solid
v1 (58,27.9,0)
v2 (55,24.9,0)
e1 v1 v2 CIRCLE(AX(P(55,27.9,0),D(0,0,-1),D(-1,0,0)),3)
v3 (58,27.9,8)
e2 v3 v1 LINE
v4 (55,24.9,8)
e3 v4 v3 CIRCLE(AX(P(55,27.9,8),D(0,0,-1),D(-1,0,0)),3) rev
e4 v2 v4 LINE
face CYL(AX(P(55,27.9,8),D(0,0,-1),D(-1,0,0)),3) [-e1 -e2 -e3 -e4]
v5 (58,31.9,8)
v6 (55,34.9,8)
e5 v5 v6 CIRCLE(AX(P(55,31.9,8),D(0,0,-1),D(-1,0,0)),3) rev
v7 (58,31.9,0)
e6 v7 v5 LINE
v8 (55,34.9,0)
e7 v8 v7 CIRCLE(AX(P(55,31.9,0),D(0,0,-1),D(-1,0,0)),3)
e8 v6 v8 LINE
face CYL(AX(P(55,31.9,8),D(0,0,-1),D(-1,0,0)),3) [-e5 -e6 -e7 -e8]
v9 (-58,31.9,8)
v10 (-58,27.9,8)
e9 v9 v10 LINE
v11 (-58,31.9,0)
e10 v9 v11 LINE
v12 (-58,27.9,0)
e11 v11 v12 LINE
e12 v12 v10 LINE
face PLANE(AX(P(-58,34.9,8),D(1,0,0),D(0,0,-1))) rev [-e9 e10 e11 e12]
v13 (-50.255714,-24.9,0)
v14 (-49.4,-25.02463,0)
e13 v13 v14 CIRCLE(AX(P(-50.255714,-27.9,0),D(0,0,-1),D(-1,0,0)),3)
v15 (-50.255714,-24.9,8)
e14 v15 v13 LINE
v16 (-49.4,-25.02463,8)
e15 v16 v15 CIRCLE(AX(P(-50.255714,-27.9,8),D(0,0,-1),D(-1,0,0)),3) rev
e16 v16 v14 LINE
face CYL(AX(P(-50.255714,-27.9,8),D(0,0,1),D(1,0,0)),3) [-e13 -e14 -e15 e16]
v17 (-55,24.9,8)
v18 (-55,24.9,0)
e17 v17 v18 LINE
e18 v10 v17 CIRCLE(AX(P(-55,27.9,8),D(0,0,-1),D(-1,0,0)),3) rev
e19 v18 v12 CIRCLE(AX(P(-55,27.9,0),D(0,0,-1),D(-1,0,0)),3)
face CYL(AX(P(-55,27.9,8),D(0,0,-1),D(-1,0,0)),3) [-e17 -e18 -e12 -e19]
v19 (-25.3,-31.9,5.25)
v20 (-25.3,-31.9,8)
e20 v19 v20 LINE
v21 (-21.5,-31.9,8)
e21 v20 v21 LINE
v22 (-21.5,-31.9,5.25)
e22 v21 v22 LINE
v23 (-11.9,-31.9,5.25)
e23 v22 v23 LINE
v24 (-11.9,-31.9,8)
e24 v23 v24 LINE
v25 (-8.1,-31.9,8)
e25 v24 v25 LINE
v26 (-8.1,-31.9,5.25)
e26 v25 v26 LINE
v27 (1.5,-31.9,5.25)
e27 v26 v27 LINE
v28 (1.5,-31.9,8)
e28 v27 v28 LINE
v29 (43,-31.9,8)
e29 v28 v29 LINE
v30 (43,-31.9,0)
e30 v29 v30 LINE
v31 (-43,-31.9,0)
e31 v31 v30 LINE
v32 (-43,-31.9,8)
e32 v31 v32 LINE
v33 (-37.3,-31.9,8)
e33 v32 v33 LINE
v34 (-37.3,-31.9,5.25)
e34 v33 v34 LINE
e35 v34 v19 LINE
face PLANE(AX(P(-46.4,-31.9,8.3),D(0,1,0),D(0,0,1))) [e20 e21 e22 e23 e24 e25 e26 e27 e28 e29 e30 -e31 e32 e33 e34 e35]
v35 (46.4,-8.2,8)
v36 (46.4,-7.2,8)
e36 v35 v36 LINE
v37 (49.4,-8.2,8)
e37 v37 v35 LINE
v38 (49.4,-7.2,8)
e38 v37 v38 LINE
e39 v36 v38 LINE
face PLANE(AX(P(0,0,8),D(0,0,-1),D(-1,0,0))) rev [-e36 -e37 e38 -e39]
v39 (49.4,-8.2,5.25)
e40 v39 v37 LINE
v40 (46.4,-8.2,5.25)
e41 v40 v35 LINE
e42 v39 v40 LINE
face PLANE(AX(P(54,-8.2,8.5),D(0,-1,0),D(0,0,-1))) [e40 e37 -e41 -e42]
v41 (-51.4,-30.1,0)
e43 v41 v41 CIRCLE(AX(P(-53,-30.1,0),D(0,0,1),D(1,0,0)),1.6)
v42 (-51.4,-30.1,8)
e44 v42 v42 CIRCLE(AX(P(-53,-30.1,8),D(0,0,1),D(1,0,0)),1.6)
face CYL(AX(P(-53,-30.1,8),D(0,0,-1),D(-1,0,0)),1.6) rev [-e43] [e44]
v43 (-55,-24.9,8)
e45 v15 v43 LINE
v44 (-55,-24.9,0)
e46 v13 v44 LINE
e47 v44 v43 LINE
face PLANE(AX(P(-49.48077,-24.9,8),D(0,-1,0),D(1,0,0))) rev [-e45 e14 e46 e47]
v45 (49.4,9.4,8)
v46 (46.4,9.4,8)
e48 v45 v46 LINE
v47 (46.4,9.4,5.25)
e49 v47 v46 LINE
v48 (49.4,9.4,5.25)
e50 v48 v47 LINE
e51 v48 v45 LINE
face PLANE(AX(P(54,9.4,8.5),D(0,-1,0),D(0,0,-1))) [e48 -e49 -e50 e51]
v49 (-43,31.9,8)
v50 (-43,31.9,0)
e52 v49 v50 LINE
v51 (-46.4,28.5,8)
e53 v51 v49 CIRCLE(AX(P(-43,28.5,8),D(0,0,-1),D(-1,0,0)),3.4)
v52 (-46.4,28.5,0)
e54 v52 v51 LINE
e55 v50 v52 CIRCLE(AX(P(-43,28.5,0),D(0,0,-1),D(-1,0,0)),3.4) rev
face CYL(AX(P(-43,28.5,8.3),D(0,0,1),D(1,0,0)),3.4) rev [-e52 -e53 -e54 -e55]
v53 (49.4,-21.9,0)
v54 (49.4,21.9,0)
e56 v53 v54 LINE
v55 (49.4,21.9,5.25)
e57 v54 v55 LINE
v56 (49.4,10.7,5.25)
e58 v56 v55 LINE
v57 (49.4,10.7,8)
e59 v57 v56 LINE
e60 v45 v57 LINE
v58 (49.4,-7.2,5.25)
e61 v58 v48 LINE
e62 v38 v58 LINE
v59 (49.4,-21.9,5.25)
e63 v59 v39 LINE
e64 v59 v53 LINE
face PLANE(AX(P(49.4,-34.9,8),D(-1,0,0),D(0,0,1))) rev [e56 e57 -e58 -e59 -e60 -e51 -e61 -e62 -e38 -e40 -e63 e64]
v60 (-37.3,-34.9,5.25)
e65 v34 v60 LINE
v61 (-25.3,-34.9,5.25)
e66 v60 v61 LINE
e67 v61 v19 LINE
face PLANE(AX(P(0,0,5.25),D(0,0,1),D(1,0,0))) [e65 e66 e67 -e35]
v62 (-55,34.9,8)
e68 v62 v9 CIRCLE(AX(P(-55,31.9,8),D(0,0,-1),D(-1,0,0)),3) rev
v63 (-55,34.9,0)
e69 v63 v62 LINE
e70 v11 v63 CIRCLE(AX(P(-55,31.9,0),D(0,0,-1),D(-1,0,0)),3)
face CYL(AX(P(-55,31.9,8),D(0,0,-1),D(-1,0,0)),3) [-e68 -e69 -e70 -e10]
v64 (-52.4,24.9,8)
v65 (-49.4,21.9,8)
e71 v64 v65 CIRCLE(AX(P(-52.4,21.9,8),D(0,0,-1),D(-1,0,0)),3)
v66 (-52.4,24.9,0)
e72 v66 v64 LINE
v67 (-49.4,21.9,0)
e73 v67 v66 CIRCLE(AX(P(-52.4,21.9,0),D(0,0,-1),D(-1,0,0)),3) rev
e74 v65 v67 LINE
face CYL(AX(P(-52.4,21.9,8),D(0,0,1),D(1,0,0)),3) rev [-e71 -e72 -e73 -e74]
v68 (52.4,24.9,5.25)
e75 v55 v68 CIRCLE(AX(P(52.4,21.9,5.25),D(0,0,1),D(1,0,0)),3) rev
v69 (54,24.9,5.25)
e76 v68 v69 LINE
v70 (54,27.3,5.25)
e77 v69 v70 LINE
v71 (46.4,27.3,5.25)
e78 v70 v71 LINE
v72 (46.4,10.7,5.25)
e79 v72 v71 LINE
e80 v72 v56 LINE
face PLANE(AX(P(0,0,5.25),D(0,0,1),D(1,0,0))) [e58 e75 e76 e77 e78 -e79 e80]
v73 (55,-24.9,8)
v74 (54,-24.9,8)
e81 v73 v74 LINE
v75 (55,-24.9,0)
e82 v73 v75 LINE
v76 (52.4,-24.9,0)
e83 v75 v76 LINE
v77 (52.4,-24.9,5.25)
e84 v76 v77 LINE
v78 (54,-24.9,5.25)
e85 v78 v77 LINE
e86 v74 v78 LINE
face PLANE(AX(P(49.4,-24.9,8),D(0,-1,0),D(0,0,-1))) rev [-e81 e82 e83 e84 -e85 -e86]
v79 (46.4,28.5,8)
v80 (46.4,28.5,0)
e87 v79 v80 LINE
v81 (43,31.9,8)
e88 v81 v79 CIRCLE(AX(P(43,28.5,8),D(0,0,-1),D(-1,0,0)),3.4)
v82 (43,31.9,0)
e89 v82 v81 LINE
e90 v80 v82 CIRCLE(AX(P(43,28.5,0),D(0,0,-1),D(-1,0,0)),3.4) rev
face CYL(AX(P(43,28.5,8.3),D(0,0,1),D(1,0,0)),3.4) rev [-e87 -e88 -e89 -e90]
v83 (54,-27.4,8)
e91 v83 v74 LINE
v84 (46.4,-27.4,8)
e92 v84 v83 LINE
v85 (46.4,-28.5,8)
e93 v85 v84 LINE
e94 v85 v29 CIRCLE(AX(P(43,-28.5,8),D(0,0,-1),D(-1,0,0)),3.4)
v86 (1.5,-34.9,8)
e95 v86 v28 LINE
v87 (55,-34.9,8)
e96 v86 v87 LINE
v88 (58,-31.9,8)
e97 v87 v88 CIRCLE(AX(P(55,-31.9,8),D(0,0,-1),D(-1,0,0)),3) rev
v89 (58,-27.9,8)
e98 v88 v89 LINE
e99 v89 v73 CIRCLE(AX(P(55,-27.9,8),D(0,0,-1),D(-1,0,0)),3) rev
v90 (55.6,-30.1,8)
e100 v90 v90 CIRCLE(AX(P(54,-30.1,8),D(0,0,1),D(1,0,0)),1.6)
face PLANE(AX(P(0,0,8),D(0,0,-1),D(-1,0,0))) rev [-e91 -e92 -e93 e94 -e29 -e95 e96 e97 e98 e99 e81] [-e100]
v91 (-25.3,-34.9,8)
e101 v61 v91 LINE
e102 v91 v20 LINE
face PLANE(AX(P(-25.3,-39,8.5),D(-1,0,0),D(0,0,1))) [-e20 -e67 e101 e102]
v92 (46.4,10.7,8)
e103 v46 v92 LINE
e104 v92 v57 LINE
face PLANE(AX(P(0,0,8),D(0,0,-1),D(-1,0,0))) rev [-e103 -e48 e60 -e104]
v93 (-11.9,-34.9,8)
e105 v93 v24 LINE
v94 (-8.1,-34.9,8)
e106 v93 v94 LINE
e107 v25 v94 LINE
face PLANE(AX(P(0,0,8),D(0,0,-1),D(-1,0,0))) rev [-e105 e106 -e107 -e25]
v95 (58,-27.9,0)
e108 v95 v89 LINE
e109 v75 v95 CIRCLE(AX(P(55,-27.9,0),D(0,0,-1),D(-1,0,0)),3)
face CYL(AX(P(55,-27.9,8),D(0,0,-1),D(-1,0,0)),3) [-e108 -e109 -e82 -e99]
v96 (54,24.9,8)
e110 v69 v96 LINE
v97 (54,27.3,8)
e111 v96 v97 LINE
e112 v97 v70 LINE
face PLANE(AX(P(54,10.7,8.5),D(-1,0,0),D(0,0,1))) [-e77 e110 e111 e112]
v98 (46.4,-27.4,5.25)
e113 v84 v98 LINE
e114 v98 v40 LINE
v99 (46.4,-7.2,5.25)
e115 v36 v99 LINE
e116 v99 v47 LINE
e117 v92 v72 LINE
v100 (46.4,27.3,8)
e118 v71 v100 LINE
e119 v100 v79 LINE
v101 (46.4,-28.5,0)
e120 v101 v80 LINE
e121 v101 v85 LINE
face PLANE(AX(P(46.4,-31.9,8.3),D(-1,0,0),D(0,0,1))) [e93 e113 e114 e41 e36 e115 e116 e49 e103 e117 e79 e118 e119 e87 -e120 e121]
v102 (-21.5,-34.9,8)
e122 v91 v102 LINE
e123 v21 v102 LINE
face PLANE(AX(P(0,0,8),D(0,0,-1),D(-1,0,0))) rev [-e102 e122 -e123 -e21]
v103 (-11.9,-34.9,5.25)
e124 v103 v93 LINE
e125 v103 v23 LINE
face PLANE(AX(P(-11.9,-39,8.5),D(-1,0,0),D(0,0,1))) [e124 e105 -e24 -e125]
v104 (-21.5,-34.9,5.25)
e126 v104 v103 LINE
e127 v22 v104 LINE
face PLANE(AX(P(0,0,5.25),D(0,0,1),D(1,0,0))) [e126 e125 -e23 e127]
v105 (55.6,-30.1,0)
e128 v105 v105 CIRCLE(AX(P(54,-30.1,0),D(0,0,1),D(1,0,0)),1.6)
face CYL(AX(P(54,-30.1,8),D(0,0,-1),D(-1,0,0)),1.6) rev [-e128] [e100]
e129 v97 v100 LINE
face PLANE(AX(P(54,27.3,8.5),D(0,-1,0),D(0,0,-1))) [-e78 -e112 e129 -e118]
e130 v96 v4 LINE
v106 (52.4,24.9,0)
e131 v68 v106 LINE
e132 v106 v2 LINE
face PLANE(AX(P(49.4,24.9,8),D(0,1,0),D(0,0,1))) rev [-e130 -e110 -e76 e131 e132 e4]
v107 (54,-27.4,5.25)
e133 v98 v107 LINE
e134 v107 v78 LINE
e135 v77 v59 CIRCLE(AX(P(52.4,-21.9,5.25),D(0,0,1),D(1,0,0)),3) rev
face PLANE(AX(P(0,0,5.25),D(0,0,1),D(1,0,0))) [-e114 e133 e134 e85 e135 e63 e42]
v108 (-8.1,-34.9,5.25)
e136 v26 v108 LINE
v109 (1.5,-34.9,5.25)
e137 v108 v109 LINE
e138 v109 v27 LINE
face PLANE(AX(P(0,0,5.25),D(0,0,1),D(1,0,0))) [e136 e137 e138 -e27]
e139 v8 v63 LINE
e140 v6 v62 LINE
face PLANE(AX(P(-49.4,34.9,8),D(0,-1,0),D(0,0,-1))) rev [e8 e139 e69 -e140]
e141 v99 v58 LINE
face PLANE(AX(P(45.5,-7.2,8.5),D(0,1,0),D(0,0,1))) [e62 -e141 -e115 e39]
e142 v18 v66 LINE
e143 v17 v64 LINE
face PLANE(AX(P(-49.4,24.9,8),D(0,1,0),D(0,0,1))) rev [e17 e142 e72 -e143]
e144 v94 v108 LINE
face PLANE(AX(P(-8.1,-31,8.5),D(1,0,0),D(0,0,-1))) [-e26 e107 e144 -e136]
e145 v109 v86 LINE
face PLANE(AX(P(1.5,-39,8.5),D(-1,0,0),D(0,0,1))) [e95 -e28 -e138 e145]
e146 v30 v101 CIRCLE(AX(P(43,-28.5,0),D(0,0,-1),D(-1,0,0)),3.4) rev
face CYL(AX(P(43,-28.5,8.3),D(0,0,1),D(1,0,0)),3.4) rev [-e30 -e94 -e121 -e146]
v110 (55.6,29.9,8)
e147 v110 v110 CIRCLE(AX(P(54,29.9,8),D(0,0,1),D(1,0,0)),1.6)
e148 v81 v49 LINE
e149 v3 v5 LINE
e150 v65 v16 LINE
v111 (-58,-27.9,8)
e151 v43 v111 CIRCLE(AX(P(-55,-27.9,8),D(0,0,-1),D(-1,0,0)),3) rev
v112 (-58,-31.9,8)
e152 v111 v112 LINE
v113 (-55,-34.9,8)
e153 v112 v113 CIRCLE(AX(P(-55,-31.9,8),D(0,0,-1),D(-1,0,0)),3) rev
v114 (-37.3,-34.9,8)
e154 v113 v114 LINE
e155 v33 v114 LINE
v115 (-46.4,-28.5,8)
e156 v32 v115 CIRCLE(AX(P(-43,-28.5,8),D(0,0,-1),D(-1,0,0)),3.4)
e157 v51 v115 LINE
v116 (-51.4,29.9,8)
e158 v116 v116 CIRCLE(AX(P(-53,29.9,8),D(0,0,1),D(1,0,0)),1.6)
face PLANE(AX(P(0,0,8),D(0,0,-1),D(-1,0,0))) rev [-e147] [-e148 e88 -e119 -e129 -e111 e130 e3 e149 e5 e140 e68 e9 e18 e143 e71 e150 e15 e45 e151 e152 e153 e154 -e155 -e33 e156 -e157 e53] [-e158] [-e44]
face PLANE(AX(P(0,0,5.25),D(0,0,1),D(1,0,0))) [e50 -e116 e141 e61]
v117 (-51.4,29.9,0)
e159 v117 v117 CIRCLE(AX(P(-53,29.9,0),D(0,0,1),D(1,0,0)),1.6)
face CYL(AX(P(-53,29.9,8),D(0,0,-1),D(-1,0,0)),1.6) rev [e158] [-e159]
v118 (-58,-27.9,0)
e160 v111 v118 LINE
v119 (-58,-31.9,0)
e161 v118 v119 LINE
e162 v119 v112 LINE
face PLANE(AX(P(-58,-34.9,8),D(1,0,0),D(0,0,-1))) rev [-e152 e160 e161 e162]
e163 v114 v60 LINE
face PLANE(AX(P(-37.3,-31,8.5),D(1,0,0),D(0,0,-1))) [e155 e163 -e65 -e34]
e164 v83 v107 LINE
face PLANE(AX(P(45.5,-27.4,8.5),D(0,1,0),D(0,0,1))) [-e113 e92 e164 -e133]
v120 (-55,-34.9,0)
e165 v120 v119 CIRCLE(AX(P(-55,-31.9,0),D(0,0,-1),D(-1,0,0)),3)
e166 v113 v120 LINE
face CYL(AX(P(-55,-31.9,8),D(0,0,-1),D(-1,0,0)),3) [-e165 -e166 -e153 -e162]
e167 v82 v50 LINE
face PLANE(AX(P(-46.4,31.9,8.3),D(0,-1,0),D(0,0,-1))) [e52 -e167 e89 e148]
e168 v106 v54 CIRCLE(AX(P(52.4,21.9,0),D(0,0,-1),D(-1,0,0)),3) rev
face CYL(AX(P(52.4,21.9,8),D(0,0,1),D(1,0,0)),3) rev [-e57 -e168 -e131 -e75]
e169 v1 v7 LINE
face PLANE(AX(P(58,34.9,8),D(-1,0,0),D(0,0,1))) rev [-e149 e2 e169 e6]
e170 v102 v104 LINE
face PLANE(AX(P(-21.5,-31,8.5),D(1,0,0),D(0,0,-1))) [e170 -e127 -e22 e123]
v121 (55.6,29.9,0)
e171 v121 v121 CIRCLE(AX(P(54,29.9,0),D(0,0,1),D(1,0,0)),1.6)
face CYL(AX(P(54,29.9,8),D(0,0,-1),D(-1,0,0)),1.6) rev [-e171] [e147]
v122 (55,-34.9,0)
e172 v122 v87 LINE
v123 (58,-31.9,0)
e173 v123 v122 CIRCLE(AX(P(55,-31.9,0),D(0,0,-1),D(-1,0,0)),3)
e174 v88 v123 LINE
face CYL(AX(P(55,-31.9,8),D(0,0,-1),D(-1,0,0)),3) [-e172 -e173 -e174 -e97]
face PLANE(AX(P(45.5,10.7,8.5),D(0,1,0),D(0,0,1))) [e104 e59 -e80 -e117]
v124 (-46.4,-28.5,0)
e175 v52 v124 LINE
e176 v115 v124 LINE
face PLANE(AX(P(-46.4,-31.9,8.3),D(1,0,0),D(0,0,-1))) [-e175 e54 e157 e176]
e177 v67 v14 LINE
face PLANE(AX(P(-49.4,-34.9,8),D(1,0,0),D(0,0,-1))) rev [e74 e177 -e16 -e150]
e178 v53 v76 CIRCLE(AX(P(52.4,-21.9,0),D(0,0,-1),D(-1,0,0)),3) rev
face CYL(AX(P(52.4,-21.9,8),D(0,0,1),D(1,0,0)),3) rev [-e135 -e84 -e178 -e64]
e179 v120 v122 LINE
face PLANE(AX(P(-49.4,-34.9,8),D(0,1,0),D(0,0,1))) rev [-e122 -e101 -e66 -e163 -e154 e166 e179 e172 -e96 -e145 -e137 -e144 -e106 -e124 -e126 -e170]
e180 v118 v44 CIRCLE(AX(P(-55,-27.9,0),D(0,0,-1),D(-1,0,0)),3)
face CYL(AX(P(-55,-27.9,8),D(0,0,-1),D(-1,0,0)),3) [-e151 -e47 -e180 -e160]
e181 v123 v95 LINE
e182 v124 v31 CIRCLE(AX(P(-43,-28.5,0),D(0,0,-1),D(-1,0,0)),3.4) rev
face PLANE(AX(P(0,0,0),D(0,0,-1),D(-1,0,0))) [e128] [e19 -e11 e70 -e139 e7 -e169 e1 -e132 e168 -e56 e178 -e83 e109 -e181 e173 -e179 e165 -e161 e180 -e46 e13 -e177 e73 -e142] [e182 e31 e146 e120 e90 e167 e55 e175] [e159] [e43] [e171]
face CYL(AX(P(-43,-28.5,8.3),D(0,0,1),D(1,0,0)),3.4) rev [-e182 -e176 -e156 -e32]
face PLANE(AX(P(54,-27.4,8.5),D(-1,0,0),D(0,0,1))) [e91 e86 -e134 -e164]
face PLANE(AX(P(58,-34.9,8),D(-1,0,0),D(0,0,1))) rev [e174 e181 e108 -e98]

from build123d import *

# Parameters (mm, degrees)
FRAMEOUTSIDE_W                    = 98.8
FRAMEOUTSIDE_H                    = 69.8
FRAME_HEIGHT_8_DEPTH              = 8
OUTSIDE_R6P4_R                    = 6.4
FRAMEINSIDE_W                     = 92.8
FRAMEINSIDE_H                     = 63.8
OPEN_THROUGH_FRAME_DEPTH          = 8.3
INSIDE_R3P4_R                     = 3.4
FOUR_CORNER_EARS_R2_PITCH110X80_R = 1.6
INTEGRAL_EARS_4X3P2_DEPTH         = 8
OPEN_TOP_CABLE_RELIEFS_START      = 5.25
PLUG_CLEARANCE_PROFILES_W         = 12
PLUG_CLEARANCE_PROFILES_H         = 8
PLUG_CLEARANCE_PROFILES_W_2       = 9.6
PLUG_CLEARANCE_PROFILES_W_3       = 8.5
PLUG_CLEARANCE_PROFILES_H_2       = 19.2
PLUG_CLEARANCE_PROFILES_H_3       = 16.6
OPEN_TOP_CABLE_RELIEFS_DEPTH      = 3.25
FILLET_1_R                        = 3


with BuildPart() as part:
    # FrameOutside → Frame_Height_8 (new body)
    with BuildSketch(Plane.XY):
        Rectangle(FRAMEOUTSIDE_W, FRAMEOUTSIDE_H)
    extrude(amount=FRAME_HEIGHT_8_DEPTH)

    # Outside_R6p4
    outside_r6p4_edges = [part.edges().sort_by_distance(p)[0] for p in [
        (49.4, -34.9, 4),
        (-49.4, -34.9, 4),
        (-49.4, 34.9, 4),
        (49.4, 34.9, 4),
    ]]
    fillet(outside_r6p4_edges, radius=OUTSIDE_R6P4_R)

    # FrameInside → Open_Through_Frame (cut)
    with BuildSketch(Plane.XY):
        Rectangle(FRAMEINSIDE_W, FRAMEINSIDE_H)
    extrude(amount=OPEN_THROUGH_FRAME_DEPTH, mode=Mode.SUBTRACT)

    # Inside_R3p4
    inside_r3p4_edges = [part.edges().sort_by_distance(p)[0] for p in [
        (46.4, -31.9, 4),
        (46.4, 31.9, 4),
        (-46.4, 31.9, 4),
        (-46.4, -31.9, 4),
    ]]
    fillet(inside_r3p4_edges, radius=INSIDE_R3P4_R)

    # Four_Corner_Ears_R2_Pitch110x80 → Integral_Ears_4x3p2 (add)
    # profile 1 of 4: a face of its own
    with BuildSketch(Plane.XY):
        Polygon((43, 34.9), (58, 34.9), (58, 24.9), (49.4, 24.9), align=None)
        with Locations((54, 29.9)):
            Circle(FOUR_CORNER_EARS_R2_PITCH110X80_R, mode=Mode.SUBTRACT)
    # profile 2 of 4: a face of its own
    with BuildSketch(Plane.XY):
        Polygon((43, -34.9), (58, -34.9), (58, -24.9), (49.4, -24.9), align=None)
        with Locations((54, -30.1)):
            Circle(FOUR_CORNER_EARS_R2_PITCH110X80_R, mode=Mode.SUBTRACT)
    # profile 3 of 4: a face of its own
    with BuildSketch(Plane.XY):
        Polygon((-43, -34.9), (-58, -34.9), (-58, -24.9), (-49.480769769, -24.9), align=None)
        with Locations((-53, -30.1)):
            Circle(FOUR_CORNER_EARS_R2_PITCH110X80_R, mode=Mode.SUBTRACT)
    # profile 4 of 4: a face of its own
    with BuildSketch(Plane.XY):
        Polygon((-43, 34.9), (-58, 34.9), (-58, 24.9), (-49.4, 24.9), align=None)
        with Locations((-53, 29.9)):
            Circle(FOUR_CORNER_EARS_R2_PITCH110X80_R, mode=Mode.SUBTRACT)
    extrude(amount=INTEGRAL_EARS_4X3P2_DEPTH)

    # Plug_Clearance_Profiles → Open_Top_Cable_Reliefs (cut)
    with BuildSketch(Plane.XY.offset(OPEN_TOP_CABLE_RELIEFS_START)):
        with Locations((-31.3, -35)):
            Rectangle(PLUG_CLEARANCE_PROFILES_W, PLUG_CLEARANCE_PROFILES_H)
        with Locations((-16.7, -35)):
            Rectangle(PLUG_CLEARANCE_PROFILES_W_2, PLUG_CLEARANCE_PROFILES_H)
        with Locations((-3.3, -35)):
            Rectangle(PLUG_CLEARANCE_PROFILES_W_2, PLUG_CLEARANCE_PROFILES_H)
        with Locations((49.75, -17.8)):
            Rectangle(PLUG_CLEARANCE_PROFILES_W_3, PLUG_CLEARANCE_PROFILES_H_2)
        with Locations((49.75, 1.1)):
            Rectangle(PLUG_CLEARANCE_PROFILES_W_3, PLUG_CLEARANCE_PROFILES_H_3)
        with Locations((49.75, 19)):
            Rectangle(PLUG_CLEARANCE_PROFILES_W_3, PLUG_CLEARANCE_PROFILES_H_3)
    extrude(amount=OPEN_TOP_CABLE_RELIEFS_DEPTH, mode=Mode.SUBTRACT)

    # 圆角1
    # the kernel refuses this fillet: 3 mm, written as the material it adds along each edge
    with BuildSketch(Plane(origin=(-49.4, 24.9, 0), x_dir=(0, -1, 0), z_dir=(0, 0, 1))) as fillet_1_piece_1:
        with BuildLine():
            CenterArc((FILLET_1_R, -FILLET_1_R), FILLET_1_R, 90, 90)
            Line((0, -FILLET_1_R), (0, 0))
            Line((0, 0), (FILLET_1_R, 0))
        make_face()
    extrude(amount=8)
    with BuildSketch(Plane(origin=(49.4, -24.9, 0), x_dir=(1, 0, 0), z_dir=(0, 0, 1)), Plane(origin=(49.4, 24.9, 0), x_dir=(0, -1, 0), z_dir=(0, 0, 1))) as fillet_1_piece_2:
        with BuildLine():
            CenterArc((FILLET_1_R, FILLET_1_R), FILLET_1_R, 180, 90)
            Line((0, FILLET_1_R), (0, 0))
            Line((0, 0), (FILLET_1_R, 0))
        make_face()
    extrude(amount=5.25)
    # the kernel refuses this fillet: 3 mm, written as the material it takes off along each edge
    with BuildSketch(Plane(origin=(-58, 34.9, -7.5), x_dir=(1, 0, 0), z_dir=(0, 0, 1)), Plane(origin=(-58, 24.9, -7.5), x_dir=(0, 1, 0), z_dir=(0, 0, 1)), Plane(origin=(-58, -24.9, -7.5), x_dir=(1, 0, 0), z_dir=(0, 0, 1)), Plane(origin=(-58, -34.9, -7.5), x_dir=(0, 1, 0), z_dir=(0, 0, 1)), Plane(origin=(58, -24.9, -7.5), x_dir=(0, -1, 0), z_dir=(0, 0, 1)), Plane(origin=(58, -34.9, -7.5), x_dir=(-1, 0, 0), z_dir=(0, 0, 1)), Plane(origin=(58, 24.9, -7.5), x_dir=(-1, 0, 0), z_dir=(0, 0, 1)), Plane(origin=(58, 34.9, -7.5), x_dir=(0, -1, 0), z_dir=(0, 0, 1))) as fillet_1_2_piece_1:
        with BuildLine():
            CenterArc((FILLET_1_R, -FILLET_1_R), FILLET_1_R, 90, 90)
            Line((0, -FILLET_1_R), (0, 0))
            Line((0, 0), (FILLET_1_R, 0))
        make_face()
    extrude(amount=23, mode=Mode.SUBTRACT)
    with BuildSketch(Plane(origin=(-49.480769769, -24.9, -1.937361077), x_dir=(0.5438533962151781, -0.8391802448968972, 0), z_dir=(0, 0, 1))) as fillet_1_2_piece_2:
        with BuildLine():
            CenterArc((2.096084574, -2.281878246), FILLET_1_R, 130.480576978, 16.573079502)
            Line((-0.421456161, -0.650318057), (0, 0))
            Line((0, 0), (0.148513864, 0))
        make_face()
    extrude(amount=11.874722155, mode=Mode.SUBTRACT)


solid = part.part
